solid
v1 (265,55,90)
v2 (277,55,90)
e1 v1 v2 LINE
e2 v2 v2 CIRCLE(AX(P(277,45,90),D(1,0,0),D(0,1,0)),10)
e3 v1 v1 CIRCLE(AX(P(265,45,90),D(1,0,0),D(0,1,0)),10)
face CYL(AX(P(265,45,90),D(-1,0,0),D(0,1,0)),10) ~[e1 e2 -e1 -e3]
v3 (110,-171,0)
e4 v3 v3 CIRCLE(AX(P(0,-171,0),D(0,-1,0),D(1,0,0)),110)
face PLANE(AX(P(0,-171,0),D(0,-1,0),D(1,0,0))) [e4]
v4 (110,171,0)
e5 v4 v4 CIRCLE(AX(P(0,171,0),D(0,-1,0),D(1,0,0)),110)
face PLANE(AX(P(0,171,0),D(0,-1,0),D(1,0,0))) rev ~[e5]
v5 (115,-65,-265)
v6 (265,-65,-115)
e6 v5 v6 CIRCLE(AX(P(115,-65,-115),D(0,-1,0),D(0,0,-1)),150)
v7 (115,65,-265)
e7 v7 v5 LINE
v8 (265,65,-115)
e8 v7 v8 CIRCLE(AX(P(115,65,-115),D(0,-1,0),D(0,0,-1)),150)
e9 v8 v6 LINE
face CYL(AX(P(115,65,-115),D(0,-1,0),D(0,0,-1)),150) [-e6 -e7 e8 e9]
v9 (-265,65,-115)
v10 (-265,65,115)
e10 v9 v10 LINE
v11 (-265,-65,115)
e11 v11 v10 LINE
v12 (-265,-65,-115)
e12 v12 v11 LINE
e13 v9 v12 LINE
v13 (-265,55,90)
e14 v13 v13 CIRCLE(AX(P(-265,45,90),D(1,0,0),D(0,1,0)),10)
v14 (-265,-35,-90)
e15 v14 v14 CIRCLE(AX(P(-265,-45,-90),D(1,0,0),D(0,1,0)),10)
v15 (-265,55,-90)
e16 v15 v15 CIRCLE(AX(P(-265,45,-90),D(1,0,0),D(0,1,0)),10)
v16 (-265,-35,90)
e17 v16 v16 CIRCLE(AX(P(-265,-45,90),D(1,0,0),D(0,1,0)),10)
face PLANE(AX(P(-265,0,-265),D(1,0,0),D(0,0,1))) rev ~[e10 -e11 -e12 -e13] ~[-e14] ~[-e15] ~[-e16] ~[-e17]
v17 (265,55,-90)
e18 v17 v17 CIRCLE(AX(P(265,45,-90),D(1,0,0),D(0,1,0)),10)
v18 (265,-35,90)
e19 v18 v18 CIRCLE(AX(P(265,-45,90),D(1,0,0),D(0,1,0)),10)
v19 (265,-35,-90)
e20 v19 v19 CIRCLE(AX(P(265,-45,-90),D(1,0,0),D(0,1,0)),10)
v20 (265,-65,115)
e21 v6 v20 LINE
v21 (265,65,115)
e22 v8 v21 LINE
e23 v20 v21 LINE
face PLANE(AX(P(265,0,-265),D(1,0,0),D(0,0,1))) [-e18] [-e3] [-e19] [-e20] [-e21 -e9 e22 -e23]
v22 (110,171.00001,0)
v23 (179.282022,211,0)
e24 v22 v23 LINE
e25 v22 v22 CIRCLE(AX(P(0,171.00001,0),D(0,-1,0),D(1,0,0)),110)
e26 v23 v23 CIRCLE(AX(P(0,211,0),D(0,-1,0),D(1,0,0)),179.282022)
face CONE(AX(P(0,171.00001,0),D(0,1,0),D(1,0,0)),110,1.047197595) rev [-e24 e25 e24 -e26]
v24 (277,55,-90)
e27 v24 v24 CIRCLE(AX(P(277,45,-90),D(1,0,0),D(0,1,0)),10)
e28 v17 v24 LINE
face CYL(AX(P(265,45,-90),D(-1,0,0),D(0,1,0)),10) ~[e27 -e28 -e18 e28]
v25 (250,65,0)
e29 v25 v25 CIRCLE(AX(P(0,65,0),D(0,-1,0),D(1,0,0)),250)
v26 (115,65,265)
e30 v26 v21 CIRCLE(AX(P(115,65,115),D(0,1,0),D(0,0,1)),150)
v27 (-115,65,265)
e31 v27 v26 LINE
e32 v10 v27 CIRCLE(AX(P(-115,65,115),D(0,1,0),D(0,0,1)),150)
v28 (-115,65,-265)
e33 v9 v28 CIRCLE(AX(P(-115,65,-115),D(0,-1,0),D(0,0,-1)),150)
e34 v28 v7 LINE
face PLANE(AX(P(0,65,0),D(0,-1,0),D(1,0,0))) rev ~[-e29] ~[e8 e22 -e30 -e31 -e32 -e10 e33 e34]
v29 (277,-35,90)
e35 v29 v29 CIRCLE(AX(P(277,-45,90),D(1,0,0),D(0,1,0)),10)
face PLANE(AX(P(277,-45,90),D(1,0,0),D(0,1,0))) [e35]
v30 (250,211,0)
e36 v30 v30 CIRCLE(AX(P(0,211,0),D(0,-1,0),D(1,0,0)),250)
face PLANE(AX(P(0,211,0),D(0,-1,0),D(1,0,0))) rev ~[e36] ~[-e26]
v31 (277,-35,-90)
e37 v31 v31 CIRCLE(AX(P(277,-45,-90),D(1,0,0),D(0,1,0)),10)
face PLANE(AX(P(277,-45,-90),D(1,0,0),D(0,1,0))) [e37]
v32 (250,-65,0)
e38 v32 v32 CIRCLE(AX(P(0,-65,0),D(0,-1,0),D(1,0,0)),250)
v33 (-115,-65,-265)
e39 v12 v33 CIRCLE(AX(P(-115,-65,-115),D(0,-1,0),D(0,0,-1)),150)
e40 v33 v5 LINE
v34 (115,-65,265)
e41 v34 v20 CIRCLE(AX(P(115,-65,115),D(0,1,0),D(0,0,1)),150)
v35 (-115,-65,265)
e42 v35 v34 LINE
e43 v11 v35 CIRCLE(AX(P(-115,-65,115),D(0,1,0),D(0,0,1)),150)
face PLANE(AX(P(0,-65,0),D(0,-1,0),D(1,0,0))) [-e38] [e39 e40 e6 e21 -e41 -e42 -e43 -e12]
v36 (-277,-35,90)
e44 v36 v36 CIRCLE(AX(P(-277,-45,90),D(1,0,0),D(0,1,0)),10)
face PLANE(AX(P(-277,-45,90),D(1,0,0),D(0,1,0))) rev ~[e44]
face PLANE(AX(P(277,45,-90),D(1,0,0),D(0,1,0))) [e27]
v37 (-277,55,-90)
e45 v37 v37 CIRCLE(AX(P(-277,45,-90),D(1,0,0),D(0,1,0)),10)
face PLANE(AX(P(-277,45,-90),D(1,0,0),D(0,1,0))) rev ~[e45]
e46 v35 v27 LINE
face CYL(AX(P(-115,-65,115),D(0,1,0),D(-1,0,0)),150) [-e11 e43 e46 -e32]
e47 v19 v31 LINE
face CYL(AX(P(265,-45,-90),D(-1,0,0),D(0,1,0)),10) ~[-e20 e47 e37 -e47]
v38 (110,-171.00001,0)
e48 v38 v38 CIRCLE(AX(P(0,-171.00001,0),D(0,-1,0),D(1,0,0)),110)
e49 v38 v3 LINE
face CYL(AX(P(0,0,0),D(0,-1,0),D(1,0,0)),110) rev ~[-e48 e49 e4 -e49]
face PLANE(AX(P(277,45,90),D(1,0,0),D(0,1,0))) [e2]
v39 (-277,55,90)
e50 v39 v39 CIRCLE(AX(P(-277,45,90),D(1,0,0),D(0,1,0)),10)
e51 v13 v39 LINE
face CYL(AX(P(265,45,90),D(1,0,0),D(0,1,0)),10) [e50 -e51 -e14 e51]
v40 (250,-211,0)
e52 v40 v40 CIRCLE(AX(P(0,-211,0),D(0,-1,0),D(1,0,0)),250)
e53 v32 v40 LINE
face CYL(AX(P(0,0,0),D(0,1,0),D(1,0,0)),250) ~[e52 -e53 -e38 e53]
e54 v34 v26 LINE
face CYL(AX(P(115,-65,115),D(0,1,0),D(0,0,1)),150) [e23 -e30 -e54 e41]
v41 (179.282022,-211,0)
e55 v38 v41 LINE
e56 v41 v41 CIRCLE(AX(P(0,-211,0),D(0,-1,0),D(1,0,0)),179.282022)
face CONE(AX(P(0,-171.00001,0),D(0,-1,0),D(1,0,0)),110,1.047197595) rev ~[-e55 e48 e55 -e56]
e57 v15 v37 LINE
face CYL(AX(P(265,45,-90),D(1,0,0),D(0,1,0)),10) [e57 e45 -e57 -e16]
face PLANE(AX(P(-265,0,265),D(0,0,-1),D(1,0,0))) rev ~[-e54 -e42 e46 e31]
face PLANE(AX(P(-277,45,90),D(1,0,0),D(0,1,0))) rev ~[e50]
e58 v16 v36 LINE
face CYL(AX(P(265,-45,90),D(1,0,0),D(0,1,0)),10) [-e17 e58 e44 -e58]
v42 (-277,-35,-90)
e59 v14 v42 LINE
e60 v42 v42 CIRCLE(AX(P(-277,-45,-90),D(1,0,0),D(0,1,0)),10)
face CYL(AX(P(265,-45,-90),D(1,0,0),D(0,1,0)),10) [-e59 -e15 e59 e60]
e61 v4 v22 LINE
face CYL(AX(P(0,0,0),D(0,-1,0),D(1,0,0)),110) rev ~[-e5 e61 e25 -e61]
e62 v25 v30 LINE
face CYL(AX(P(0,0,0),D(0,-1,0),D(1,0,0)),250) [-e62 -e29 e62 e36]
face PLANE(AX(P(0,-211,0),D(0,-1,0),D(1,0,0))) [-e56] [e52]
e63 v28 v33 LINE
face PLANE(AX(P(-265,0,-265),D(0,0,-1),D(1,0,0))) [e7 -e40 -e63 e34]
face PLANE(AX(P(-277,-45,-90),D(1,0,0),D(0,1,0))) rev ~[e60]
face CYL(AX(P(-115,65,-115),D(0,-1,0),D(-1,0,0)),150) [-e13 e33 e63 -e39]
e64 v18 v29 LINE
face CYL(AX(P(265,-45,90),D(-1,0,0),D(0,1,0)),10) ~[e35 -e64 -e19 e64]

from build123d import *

# Parameters (mm, degrees)
F0_W          = 530
F0_H          = 530
F0_R          = 250
F1_DEPTH      = 65
F1_DEPTH_BACK = 65
F2_R          = 10
F3_DEPTH      = 12
F3_DEPTH_BACK = 542
F4_R          = 150
F0_R_2        = 110
F5_DEPTH      = 211
F5_DEPTH_BACK = 211
F6_DEPTH      = 171
F6_DEPTH_BACK = 171
F7_SIZE2      = 69.282022
F7_SIZE       = 39.99999
F8_SIZE2      = 69.282022
F8_SIZE       = 39.99999


# Not quite as in the source:
# - a fillet or chamfer is up to 0.001 mm smaller than in the source, because OpenCascade refuses the exact size


with BuildPart() as f1:
    # F0 (on Front) → F1 (new body, two sides)
    with BuildSketch(Plane.XZ) as f1_sk:
        Rectangle(F0_W, F0_H)
        Circle(F0_R, mode=Mode.SUBTRACT)
    extrude(amount=F1_DEPTH)
    extrude(f1_sk.sketch, amount=-F1_DEPTH_BACK)

    # F2 (on face) → F3 (join, two sides)
    with BuildSketch(Plane.YZ.offset(265)) as f3_sk:
        with Locations((-45, 90)):
            Circle(F2_R)
        with Locations((45, 90)):
            Circle(F2_R)
        with Locations((45, -90)):
            Circle(F2_R)
        with Locations((-45, -90)):
            Circle(F2_R)
    extrude(amount=F3_DEPTH)
    extrude(f3_sk.sketch, amount=-F3_DEPTH_BACK)

    # F4
    f4_edges = [f1.edges().sort_by_distance(p)[0] for p in [
        (265, 0, 265),
        (-265, 0, 265),
        (265, 0, -265),
        (-265, 0, -265),
    ]]
    fillet(f4_edges, radius=F4_R)

    # F0 (on Front) → F5 (join, two sides)
    with BuildSketch(Plane.XZ) as f5_sk:
        Circle(F0_R)
        Circle(F0_R_2, mode=Mode.SUBTRACT)
    extrude(amount=F5_DEPTH)
    extrude(f5_sk.sketch, amount=-F5_DEPTH_BACK)

    # F0 (on Front) → F6 (join, two sides)
    with BuildSketch(Plane.XZ) as f6_sk:
        Circle(F0_R_2)
    extrude(amount=F6_DEPTH)
    extrude(f6_sk.sketch, amount=-F6_DEPTH_BACK)

    # F7 (size 40 and 69.2820323028 in the source; OpenCascade refuses exactly that, so slightly less here)
    f7_edges = [f1.edges().sort_by_distance(p)[0] for p in [
        (-110, -211, 0),
    ]]
    f7_side = f1.faces().sort_by_distance((-110, -191, 0))[0]
    chamfer(f7_edges, length=F7_SIZE, length2=F7_SIZE2, reference=f7_side)

    # F8 (size 40 and 69.2820323028 in the source; OpenCascade refuses exactly that, so slightly less here)
    f8_edges = [f1.edges().sort_by_distance(p)[0] for p in [
        (-110, 211, 0),
    ]]
    f8_side = f1.faces().sort_by_distance((-110, 191, 0))[0]
    chamfer(f8_edges, length=F8_SIZE, length2=F8_SIZE2, reference=f8_side)


solid = f1.part
